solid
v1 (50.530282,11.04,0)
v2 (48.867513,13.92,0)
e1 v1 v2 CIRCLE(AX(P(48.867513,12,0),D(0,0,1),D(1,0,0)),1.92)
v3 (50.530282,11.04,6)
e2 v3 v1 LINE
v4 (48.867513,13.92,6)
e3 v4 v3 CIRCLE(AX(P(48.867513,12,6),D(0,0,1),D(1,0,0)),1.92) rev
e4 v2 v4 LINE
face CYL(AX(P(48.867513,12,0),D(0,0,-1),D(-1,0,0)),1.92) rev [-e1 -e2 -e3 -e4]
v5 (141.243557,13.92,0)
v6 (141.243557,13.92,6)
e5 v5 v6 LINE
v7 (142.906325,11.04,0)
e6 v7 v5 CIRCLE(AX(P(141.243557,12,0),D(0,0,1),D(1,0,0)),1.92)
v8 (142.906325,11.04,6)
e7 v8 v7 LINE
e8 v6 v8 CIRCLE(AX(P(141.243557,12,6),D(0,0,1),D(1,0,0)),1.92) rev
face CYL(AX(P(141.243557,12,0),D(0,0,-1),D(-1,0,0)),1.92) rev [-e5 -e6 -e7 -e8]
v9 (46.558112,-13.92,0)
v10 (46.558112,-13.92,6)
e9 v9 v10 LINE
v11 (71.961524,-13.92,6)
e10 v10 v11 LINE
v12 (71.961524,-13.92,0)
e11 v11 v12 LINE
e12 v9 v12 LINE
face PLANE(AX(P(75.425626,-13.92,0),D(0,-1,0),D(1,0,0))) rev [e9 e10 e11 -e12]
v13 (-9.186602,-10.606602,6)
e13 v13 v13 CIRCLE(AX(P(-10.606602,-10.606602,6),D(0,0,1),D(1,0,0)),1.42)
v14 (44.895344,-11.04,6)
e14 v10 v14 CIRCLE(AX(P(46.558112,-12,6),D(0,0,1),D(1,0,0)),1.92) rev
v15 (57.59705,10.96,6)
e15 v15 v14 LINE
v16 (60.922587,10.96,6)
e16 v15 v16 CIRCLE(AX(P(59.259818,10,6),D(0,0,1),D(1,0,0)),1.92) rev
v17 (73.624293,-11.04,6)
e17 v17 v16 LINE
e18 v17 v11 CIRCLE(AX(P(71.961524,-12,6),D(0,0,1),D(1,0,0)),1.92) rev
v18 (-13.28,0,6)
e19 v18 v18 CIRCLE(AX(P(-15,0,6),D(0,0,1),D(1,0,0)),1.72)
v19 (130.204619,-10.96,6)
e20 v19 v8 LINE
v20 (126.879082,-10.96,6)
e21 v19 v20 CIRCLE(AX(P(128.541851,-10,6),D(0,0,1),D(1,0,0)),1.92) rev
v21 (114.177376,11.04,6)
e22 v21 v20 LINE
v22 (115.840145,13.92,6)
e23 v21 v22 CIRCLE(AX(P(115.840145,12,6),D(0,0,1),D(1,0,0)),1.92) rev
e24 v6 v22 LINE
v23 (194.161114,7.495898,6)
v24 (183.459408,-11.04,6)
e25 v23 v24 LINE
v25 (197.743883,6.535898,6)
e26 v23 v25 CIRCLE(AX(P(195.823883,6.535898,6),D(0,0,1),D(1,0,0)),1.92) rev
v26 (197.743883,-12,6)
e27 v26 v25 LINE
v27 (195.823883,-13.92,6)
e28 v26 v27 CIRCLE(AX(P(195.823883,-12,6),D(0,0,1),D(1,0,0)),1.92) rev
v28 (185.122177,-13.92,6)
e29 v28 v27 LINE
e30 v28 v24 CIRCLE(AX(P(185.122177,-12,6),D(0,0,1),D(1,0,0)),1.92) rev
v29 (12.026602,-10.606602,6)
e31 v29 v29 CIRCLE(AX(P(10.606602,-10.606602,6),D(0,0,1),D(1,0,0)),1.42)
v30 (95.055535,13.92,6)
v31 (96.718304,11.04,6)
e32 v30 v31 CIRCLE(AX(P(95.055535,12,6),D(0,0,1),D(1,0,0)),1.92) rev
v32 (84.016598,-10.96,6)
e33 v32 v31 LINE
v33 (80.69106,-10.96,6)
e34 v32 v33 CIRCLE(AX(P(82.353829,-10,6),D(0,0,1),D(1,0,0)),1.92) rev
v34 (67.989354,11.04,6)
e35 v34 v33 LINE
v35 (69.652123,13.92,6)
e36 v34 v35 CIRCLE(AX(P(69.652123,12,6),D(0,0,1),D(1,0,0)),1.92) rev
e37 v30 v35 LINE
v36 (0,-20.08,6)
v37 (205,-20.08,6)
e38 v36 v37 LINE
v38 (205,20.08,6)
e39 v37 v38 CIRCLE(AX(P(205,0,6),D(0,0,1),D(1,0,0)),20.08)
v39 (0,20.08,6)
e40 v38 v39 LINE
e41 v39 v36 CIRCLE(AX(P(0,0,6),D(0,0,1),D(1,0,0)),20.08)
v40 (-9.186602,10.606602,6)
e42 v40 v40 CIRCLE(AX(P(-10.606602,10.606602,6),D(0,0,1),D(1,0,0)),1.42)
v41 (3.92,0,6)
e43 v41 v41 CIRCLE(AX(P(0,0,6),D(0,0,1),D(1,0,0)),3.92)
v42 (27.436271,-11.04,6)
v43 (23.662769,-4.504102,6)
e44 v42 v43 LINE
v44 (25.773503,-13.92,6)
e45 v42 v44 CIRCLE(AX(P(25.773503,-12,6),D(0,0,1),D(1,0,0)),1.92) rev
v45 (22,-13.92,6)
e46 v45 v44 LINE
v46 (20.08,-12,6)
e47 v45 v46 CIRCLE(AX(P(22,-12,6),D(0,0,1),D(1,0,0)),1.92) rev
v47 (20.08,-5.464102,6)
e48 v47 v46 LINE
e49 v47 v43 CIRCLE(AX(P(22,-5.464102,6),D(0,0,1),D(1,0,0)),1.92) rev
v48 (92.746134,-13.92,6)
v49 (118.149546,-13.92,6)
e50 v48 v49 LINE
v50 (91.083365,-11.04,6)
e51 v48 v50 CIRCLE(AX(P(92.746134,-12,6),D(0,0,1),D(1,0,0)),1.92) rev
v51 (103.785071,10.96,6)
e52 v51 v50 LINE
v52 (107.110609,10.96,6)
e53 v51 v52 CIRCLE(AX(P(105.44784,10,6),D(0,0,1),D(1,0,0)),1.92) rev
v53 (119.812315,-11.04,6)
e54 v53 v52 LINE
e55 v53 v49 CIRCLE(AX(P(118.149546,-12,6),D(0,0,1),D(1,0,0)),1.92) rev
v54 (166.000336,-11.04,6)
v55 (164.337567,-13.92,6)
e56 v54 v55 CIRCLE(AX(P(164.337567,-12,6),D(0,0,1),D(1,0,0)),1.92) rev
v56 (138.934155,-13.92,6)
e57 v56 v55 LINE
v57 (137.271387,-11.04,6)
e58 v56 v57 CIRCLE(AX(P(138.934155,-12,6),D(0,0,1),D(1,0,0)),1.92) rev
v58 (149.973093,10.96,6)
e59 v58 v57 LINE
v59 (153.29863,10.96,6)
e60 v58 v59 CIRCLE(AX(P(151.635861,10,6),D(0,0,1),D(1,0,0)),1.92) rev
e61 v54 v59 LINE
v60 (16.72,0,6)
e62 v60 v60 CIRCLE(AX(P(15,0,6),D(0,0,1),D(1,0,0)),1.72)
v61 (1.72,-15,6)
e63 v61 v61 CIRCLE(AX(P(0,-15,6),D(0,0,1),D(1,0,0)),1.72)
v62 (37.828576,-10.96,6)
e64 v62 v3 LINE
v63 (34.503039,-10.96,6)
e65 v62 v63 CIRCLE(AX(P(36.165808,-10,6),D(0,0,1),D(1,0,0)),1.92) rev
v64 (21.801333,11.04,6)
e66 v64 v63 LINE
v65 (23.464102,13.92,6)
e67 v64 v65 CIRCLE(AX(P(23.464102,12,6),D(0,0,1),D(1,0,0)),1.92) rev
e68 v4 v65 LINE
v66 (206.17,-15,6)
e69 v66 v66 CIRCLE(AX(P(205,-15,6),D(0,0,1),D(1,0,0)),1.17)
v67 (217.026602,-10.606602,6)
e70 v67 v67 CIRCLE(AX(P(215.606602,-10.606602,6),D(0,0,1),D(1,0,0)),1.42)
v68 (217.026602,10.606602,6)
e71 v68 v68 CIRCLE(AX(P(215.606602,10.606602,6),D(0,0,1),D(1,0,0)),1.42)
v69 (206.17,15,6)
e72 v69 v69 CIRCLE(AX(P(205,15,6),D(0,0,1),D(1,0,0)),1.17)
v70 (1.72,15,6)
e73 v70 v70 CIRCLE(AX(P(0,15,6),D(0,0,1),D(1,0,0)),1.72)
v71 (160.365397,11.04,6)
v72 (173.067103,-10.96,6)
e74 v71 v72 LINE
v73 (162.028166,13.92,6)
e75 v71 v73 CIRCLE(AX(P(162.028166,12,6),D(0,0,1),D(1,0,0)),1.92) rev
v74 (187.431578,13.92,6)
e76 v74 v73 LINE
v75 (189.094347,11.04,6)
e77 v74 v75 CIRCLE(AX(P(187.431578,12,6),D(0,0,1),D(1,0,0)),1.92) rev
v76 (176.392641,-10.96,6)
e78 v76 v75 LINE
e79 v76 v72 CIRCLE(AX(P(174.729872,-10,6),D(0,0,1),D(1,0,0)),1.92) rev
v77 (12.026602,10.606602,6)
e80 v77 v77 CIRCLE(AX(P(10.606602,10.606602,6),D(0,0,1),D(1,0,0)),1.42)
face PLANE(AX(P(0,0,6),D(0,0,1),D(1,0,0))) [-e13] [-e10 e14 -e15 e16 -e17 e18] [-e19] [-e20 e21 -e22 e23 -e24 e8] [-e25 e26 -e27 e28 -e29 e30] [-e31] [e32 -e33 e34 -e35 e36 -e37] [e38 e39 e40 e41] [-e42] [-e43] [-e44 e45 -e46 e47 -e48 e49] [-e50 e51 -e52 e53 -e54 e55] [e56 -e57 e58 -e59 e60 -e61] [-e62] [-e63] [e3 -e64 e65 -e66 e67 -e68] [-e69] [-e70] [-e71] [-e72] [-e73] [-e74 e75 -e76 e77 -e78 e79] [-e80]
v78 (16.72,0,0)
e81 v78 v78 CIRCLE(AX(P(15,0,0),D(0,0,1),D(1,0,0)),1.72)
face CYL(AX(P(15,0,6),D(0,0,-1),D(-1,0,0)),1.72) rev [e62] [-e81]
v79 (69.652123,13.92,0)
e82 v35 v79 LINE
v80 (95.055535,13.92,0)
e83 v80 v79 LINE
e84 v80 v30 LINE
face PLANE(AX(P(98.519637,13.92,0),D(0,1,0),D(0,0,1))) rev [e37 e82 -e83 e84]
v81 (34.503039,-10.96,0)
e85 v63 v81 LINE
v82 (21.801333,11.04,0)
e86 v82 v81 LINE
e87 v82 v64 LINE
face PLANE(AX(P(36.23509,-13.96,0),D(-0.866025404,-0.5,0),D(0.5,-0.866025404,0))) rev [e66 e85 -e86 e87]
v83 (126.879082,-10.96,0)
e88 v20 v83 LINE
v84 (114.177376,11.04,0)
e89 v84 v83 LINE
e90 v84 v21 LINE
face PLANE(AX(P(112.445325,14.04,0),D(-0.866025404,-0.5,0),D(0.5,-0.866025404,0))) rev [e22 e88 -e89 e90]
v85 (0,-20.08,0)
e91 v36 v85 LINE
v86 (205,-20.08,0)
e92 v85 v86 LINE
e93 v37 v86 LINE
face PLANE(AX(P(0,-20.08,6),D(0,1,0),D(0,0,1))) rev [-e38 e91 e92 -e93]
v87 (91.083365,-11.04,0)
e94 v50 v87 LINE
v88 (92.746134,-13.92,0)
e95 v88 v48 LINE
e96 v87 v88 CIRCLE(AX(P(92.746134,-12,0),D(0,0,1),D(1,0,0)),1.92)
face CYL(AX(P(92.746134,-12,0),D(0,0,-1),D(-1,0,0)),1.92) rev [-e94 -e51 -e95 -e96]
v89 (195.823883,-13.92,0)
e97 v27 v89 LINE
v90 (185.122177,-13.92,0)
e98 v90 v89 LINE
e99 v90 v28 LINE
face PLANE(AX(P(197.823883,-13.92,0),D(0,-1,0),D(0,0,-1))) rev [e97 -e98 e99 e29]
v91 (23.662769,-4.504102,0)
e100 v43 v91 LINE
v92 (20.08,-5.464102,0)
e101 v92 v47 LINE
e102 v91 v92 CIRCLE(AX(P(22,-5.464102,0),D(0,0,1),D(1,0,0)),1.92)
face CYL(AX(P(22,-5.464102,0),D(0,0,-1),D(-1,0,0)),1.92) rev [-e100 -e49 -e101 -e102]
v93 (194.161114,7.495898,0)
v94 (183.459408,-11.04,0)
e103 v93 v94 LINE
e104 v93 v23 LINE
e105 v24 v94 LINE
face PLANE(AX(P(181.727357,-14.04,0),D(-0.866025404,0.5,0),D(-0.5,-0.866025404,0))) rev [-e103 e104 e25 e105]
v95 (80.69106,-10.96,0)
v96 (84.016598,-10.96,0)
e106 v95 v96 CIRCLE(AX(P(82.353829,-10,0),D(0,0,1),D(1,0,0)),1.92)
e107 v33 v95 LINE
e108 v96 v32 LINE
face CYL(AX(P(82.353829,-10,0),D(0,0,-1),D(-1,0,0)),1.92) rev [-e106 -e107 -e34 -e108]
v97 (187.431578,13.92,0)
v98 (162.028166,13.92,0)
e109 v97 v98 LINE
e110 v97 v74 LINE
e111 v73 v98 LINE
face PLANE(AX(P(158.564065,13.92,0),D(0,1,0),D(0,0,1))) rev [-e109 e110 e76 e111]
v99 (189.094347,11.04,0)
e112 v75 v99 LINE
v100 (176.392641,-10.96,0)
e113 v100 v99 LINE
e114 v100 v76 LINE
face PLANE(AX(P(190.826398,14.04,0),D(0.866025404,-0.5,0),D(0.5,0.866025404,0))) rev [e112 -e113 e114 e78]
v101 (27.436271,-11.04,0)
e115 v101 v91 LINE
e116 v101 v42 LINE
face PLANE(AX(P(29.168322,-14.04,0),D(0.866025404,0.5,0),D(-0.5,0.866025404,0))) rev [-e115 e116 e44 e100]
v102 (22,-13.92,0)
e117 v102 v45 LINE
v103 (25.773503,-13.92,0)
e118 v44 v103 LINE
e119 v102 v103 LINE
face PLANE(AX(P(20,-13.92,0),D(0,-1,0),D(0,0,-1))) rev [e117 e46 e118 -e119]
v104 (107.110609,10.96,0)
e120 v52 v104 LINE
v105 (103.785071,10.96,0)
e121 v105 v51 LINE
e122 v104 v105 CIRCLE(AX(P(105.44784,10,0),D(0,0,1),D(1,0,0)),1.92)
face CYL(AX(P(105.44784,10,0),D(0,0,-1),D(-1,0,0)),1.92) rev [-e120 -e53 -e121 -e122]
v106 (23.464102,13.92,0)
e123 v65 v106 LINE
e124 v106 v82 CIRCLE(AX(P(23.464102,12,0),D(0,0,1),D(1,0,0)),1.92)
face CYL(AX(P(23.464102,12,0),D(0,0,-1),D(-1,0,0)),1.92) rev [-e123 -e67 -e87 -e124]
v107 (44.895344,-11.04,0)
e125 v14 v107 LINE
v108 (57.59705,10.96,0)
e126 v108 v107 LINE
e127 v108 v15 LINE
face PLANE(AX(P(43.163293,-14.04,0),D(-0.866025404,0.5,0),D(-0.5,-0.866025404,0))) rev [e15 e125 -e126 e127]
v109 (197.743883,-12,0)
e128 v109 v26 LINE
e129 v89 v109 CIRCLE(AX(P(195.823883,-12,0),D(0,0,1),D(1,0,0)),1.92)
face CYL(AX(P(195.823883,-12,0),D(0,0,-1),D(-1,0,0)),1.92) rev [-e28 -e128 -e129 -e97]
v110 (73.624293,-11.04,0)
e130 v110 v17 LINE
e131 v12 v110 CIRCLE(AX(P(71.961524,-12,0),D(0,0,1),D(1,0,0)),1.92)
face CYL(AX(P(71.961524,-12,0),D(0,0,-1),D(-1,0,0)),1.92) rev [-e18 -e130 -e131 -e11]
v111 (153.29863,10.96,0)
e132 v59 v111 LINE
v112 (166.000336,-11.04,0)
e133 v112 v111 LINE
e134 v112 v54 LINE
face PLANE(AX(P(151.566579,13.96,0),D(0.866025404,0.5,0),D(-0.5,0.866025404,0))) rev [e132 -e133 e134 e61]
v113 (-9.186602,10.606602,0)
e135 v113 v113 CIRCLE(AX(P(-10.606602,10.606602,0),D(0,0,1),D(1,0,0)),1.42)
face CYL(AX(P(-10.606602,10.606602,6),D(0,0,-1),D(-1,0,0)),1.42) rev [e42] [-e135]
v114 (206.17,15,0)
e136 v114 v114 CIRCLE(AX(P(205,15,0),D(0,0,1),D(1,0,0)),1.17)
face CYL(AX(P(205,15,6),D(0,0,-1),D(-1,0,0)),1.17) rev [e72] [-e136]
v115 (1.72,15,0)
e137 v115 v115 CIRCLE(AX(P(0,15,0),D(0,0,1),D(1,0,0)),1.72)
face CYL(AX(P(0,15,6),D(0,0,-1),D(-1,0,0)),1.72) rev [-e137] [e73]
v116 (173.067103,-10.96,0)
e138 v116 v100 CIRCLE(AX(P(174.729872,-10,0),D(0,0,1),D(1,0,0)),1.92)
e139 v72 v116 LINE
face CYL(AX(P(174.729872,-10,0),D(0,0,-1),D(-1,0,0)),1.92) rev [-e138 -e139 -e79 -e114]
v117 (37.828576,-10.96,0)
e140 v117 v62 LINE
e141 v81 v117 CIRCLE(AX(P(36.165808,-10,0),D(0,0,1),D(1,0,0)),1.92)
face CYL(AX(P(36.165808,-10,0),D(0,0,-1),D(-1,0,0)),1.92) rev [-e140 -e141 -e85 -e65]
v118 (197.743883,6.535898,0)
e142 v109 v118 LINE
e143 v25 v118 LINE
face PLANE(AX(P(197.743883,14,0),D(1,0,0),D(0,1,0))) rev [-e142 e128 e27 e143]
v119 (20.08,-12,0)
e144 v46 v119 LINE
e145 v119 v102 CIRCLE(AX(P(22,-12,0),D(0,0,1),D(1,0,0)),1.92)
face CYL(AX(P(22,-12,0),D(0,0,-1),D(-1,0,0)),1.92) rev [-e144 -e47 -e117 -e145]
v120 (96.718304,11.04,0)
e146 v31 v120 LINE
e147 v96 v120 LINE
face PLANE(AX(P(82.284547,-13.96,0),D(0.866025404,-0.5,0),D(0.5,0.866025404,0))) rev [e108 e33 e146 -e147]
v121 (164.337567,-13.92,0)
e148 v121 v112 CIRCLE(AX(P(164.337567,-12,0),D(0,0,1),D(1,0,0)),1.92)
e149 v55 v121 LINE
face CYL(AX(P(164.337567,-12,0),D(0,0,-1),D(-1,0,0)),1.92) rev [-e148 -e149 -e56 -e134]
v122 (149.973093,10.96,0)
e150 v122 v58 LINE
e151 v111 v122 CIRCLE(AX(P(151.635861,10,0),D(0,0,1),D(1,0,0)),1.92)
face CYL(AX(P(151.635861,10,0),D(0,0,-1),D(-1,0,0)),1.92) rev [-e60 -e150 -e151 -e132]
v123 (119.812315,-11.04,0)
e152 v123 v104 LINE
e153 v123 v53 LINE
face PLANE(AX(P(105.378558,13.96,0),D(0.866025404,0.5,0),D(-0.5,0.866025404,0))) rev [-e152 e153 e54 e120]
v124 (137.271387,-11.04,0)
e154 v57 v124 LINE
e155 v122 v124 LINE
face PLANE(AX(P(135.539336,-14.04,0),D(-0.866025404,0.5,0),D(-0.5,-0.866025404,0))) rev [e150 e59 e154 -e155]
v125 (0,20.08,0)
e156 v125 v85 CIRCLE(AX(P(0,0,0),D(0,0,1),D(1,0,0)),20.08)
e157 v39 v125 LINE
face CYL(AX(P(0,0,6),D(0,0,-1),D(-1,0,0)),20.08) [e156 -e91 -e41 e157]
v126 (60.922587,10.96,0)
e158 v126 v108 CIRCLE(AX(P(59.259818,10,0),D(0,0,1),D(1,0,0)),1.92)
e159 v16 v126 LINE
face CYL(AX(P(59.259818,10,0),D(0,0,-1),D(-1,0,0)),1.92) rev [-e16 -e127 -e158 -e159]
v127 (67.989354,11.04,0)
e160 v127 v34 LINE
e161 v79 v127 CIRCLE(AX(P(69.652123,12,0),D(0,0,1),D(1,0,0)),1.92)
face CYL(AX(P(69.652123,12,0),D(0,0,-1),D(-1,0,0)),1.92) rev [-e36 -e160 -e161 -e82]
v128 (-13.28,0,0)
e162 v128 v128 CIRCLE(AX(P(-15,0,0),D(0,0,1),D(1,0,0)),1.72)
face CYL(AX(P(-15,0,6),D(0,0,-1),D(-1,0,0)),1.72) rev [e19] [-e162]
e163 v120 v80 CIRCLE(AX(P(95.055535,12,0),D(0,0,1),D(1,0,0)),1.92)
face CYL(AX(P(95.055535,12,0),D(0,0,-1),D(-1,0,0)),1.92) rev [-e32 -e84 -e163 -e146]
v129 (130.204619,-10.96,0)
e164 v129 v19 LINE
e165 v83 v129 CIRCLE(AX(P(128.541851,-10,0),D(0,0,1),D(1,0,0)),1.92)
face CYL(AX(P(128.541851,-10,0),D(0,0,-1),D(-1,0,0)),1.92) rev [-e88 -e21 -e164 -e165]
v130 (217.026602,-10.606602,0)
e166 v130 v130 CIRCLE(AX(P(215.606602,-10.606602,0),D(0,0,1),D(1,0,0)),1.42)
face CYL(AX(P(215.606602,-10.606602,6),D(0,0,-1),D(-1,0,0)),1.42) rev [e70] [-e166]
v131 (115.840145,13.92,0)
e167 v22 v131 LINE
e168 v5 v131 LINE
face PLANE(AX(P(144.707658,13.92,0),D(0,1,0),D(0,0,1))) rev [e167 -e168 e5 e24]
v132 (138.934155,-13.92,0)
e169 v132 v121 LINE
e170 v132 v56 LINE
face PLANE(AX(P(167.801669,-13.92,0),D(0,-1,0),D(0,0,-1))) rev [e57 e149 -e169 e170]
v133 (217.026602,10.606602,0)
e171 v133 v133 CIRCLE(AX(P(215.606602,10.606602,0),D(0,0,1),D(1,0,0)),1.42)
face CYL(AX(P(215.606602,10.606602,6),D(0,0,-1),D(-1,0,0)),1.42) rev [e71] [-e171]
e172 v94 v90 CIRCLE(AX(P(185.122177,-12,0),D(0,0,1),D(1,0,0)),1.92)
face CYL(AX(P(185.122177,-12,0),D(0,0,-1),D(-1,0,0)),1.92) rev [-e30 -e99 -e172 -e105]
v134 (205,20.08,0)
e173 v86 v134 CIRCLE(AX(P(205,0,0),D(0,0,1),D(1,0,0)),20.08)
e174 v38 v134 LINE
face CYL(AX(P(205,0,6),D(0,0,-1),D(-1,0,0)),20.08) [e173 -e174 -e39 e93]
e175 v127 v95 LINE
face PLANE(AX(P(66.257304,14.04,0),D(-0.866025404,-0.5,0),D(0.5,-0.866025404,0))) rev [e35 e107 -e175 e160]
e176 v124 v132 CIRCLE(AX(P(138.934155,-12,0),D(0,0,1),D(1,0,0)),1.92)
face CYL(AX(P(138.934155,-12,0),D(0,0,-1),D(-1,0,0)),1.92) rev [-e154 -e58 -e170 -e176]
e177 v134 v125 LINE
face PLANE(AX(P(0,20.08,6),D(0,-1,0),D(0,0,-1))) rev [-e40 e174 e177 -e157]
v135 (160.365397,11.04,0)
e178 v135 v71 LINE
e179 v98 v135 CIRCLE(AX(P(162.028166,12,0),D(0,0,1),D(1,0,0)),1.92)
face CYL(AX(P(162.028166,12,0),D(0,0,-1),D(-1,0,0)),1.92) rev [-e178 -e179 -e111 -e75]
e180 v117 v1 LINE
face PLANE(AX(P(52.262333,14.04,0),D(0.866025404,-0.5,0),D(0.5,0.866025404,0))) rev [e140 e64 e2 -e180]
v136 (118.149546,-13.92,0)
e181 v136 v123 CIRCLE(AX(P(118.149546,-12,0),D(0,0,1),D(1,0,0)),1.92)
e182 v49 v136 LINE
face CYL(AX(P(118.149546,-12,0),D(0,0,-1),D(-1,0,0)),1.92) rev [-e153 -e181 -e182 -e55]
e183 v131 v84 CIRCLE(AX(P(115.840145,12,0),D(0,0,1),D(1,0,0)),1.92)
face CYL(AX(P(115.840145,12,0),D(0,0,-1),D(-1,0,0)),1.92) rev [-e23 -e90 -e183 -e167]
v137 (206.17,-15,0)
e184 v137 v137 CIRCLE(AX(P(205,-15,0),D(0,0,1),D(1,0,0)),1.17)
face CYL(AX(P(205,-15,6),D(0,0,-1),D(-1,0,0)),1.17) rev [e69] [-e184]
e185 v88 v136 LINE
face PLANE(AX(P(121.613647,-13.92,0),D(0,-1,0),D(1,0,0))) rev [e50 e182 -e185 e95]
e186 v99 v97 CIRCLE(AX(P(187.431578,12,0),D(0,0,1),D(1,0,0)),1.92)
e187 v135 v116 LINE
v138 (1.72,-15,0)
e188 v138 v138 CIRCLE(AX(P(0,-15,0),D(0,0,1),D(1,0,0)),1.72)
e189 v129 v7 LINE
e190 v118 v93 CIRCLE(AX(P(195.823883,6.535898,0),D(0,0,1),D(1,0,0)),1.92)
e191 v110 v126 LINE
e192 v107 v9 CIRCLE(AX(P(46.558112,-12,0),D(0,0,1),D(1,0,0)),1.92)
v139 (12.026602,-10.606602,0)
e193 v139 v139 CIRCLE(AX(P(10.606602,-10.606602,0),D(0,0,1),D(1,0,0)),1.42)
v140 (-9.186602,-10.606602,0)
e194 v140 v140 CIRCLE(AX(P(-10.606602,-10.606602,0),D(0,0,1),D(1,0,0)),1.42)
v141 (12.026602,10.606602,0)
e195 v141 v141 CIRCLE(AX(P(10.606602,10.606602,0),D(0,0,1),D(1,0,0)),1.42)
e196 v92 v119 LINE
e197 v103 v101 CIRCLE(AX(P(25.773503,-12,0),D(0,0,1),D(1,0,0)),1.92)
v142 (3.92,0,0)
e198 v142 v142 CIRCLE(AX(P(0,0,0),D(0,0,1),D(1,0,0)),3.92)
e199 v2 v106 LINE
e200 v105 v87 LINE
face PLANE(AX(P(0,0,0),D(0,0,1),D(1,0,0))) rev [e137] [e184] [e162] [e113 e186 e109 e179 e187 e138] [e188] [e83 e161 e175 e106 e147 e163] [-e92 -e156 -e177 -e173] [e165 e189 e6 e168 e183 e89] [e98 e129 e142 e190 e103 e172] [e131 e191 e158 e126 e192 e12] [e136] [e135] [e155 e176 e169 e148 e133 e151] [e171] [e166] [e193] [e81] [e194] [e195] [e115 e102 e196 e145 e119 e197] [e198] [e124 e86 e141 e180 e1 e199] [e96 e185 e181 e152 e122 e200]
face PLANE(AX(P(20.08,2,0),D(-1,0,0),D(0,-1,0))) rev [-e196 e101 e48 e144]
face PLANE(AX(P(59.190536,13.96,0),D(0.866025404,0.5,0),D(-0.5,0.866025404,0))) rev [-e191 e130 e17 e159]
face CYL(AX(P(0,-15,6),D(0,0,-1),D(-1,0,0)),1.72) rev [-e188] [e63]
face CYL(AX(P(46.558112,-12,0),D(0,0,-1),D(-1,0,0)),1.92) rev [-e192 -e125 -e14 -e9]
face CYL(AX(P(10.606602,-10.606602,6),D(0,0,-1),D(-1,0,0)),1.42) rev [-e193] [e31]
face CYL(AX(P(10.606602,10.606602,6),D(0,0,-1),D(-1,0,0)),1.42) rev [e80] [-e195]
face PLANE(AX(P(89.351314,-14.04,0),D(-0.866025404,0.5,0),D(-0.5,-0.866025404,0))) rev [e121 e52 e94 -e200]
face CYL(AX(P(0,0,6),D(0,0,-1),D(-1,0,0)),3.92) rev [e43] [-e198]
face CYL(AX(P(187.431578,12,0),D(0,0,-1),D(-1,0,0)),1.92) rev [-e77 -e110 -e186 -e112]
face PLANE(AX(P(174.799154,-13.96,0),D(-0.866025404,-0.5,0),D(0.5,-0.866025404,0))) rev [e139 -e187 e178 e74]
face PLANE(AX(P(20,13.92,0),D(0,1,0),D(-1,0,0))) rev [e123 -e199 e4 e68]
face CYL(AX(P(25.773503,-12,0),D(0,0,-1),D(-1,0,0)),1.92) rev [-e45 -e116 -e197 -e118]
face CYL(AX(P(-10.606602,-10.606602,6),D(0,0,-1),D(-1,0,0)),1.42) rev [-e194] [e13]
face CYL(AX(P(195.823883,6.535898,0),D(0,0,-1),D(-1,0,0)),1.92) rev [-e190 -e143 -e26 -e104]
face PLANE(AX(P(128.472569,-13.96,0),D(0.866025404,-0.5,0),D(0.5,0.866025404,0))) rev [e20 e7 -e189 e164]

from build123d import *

# Parameters (mm, degrees)
SKETCH1_R              = 4
SKETCH1_R_2            = 1.25
SKETCH1_R_3            = 1.5
SKETCH1_R_4            = 1.8
BOSS_EXTRUDE1_DEPTH    = 6
CUT_EXTRUDE1_DEPTH     = 226.966811722
FILLET1_R              = 2
MOVE_FACE1_OUTLINE_R   = 4
MOVE_FACE1_OUTLINE_R_2 = 3.92
MOVE_FACE1_OUTLINE_R_3 = 1.25
MOVE_FACE1_OUTLINE_R_4 = 1.17
MOVE_FACE1_OUTLINE_R_5 = 1.5
MOVE_FACE1_OUTLINE_R_6 = 1.42
MOVE_FACE1_OUTLINE_R_7 = 1.8
MOVE_FACE1_OUTLINE_R_8 = 1.72
MOVE_FACE1_DEPTH       = 6


# Read off the part's stored shape, not the designer's step: Move Face1
with BuildPart() as part:
    # Sketch1 → Boss-Extrude1 (new body)
    with BuildSketch(Plane.XY):
        with BuildLine():
            Line((0, -20), (205, -20))
            ThreePointArc((205, -20), (225, 0), (205, 20))
            Line((205, 20), (0, 20))
            ThreePointArc((0, 20), (-20, 0), (0, -20))
        make_face()
        Circle(SKETCH1_R, mode=Mode.SUBTRACT)
        with Locations((205, -15)):
            Circle(SKETCH1_R_2, mode=Mode.SUBTRACT)
        with Locations((215.606601718, -10.606601718)):
            Circle(SKETCH1_R_3, mode=Mode.SUBTRACT)
        with Locations((205, 15)):
            Circle(SKETCH1_R_2, mode=Mode.SUBTRACT)
        with Locations((215.606601718, 10.606601718)):
            Circle(SKETCH1_R_3, mode=Mode.SUBTRACT)
        with Locations((0, -15)):
            Circle(SKETCH1_R_4, mode=Mode.SUBTRACT)
        with Locations((10.606601718, -10.606601718)):
            Circle(SKETCH1_R_3, mode=Mode.SUBTRACT)
        with Locations((-15, 0)):
            Circle(SKETCH1_R_4, mode=Mode.SUBTRACT)
        with Locations((-10.606601718, -10.606601718)):
            Circle(SKETCH1_R_3, mode=Mode.SUBTRACT)
        with Locations((0, 15)):
            Circle(SKETCH1_R_4, mode=Mode.SUBTRACT)
        with Locations((-10.606601718, 10.606601718)):
            Circle(SKETCH1_R_3, mode=Mode.SUBTRACT)
        with Locations((15, 0)):
            Circle(SKETCH1_R_4, mode=Mode.SUBTRACT)
        with Locations((10.606601718, 10.606601718)):
            Circle(SKETCH1_R_3, mode=Mode.SUBTRACT)
    extrude(amount=BOSS_EXTRUDE1_DEPTH)

    # Sketch2 → Cut-Extrude1 (cut, through all)
    with BuildSketch(Plane.XY.offset(6)):
        Polygon((20, 14), (52.331615075, 14), (36.165807537, -14), align=None)
        Polygon((43.094010768, -14), (59.259818305, 14), (75.425625842, -14), align=None)
        Polygon((66.188021535, 14), (82.353829072, -14), (98.51963661, 14), align=None)
        Polygon((89.282032303, -14), (105.44783984, 14), (121.613647377, -14), align=None)
        Polygon((112.37604307, 14), (128.541850608, -14), (144.707658145, 14), align=None)
        Polygon((20, 2), (20, -14), (29.237604307, -14), align=None)
        Polygon((135.470053838, -14), (151.635861375, 14), (167.801668913, -14), align=None)
        Polygon((174.729872143, -14), (158.564064606, 14), (190.89567968, 14), align=None)
        Polygon((181.658075373, -14), (197.82388291, 14), (197.82388291, -14), align=None)
    extrude(amount=-CUT_EXTRUDE1_DEPTH, mode=Mode.SUBTRACT)

    # Fillet1
    fillet1_edges = [part.edges().sort_by_distance(p)[0] for p in [
        (121.613647377, -14, 3),
        (89.282032303, -14, 3),
        (105.44783984, 14, 3),
        (112.37604307, 14, 3),
        (144.707658145, 14, 3),
        (128.541850608, -14, 3),
        (20, 2, 3),
        (29.237604307, -14, 3),
        (20, -14, 3),
        (167.801668913, -14, 3),
        (135.470053838, -14, 3),
        (151.635861375, 14, 3),
        (190.89567968, 14, 3),
        (174.729872143, -14, 3),
        (158.564064606, 14, 3),
        (197.82388291, -14, 3),
        (181.658075373, -14, 3),
        (197.82388291, 14, 3),
        (36.165807537, -14, 3),
        (20, 14, 3),
        (52.331615075, 14, 3),
        (75.425625842, -14, 3),
        (43.094010768, -14, 3),
        (59.259818305, 14, 3),
        (66.188021535, 14, 3),
        (98.51963661, 14, 3),
        (82.353829072, -14, 3),
    ]]
    fillet(fillet1_edges, radius=FILLET1_R)

    # Move Face1 outline → Move Face1 (add)
    # profile 1 of 23: a face of its own
    with BuildSketch(Plane.XY):
        with BuildLine():
            ThreePointArc((0, 20.08), (-20.08, 0), (0, -20.08))
            Line((0, -20.08), (205, -20.08))
            ThreePointArc((205, -20.08), (225.08, 0), (205, 20.08))
            Line((205, 20.08), (0, 20.08))
        make_face()
        with BuildLine():
            Line((205, -20), (0, -20))
            ThreePointArc((0, -20), (-20, 0), (0, 20))
            Line((0, 20), (205, 20))
            ThreePointArc((205, 20), (225, 0), (205, -20))
        make_face(mode=Mode.SUBTRACT)
    # profile 2 of 23: a face of its own
    with BuildSketch(Plane.XY):
        Circle(MOVE_FACE1_OUTLINE_R)
        Circle(MOVE_FACE1_OUTLINE_R_2, mode=Mode.SUBTRACT)
    # profile 3 of 23: a face of its own
    with BuildSketch(Plane.XY):
        with Locations((205, -15)):
            Circle(MOVE_FACE1_OUTLINE_R_3)
        with Locations((205, -15)):
            Circle(MOVE_FACE1_OUTLINE_R_4, mode=Mode.SUBTRACT)
    # profile 4 of 23: a face of its own
    with BuildSketch(Plane.XY):
        with Locations((215.606601718, -10.606601718)):
            Circle(MOVE_FACE1_OUTLINE_R_5)
        with Locations((215.606601718, -10.606601718)):
            Circle(MOVE_FACE1_OUTLINE_R_6, mode=Mode.SUBTRACT)
    # profile 5 of 23: a face of its own
    with BuildSketch(Plane.XY):
        with Locations((205, 15)):
            Circle(MOVE_FACE1_OUTLINE_R_3)
        with Locations((205, 15)):
            Circle(MOVE_FACE1_OUTLINE_R_4, mode=Mode.SUBTRACT)
    # profile 6 of 23: a face of its own
    with BuildSketch(Plane.XY):
        with Locations((215.606601718, 10.606601718)):
            Circle(MOVE_FACE1_OUTLINE_R_5)
        with Locations((215.606601718, 10.606601718)):
            Circle(MOVE_FACE1_OUTLINE_R_6, mode=Mode.SUBTRACT)
    # profile 7 of 23: a face of its own
    with BuildSketch(Plane.XY):
        with Locations((0, -15)):
            Circle(MOVE_FACE1_OUTLINE_R_7)
        with Locations((0, -15)):
            Circle(MOVE_FACE1_OUTLINE_R_8, mode=Mode.SUBTRACT)
    # profile 8 of 23: a face of its own
    with BuildSketch(Plane.XY):
        with Locations((10.606601718, -10.606601718)):
            Circle(MOVE_FACE1_OUTLINE_R_5)
        with Locations((10.606601718, -10.606601718)):
            Circle(MOVE_FACE1_OUTLINE_R_6, mode=Mode.SUBTRACT)
    # profile 9 of 23: a face of its own
    with BuildSketch(Plane.XY):
        with Locations((-15, 0)):
            Circle(MOVE_FACE1_OUTLINE_R_7)
        with Locations((-15, 0)):
            Circle(MOVE_FACE1_OUTLINE_R_8, mode=Mode.SUBTRACT)
    # profile 10 of 23: a face of its own
    with BuildSketch(Plane.XY):
        with Locations((-10.606601718, -10.606601718)):
            Circle(MOVE_FACE1_OUTLINE_R_5)
        with Locations((-10.606601718, -10.606601718)):
            Circle(MOVE_FACE1_OUTLINE_R_6, mode=Mode.SUBTRACT)
    # profile 11 of 23: a face of its own
    with BuildSketch(Plane.XY):
        with Locations((0, 15)):
            Circle(MOVE_FACE1_OUTLINE_R_7)
        with Locations((0, 15)):
            Circle(MOVE_FACE1_OUTLINE_R_8, mode=Mode.SUBTRACT)
    # profile 12 of 23: a face of its own
    with BuildSketch(Plane.XY):
        with Locations((-10.606601718, 10.606601718)):
            Circle(MOVE_FACE1_OUTLINE_R_5)
        with Locations((-10.606601718, 10.606601718)):
            Circle(MOVE_FACE1_OUTLINE_R_6, mode=Mode.SUBTRACT)
    # profile 13 of 23: a face of its own
    with BuildSketch(Plane.XY):
        with Locations((15, 0)):
            Circle(MOVE_FACE1_OUTLINE_R_7)
        with Locations((15, 0)):
            Circle(MOVE_FACE1_OUTLINE_R_8, mode=Mode.SUBTRACT)
    # profile 14 of 23: a face of its own
    with BuildSketch(Plane.XY):
        with Locations((10.606601718, 10.606601718)):
            Circle(MOVE_FACE1_OUTLINE_R_5)
        with Locations((10.606601718, 10.606601718)):
            Circle(MOVE_FACE1_OUTLINE_R_6, mode=Mode.SUBTRACT)
    # profile 15 of 23: a face of its own
    with BuildSketch(Plane.XY):
        with BuildLine():
            ThreePointArc((23.464101615, 14), (21.732050808, 13), (21.732050808, 11))
            Line((21.732050808, 11), (34.43375673, -11))
            ThreePointArc((34.43375673, -11), (36.165807538, -12), (37.897858345, -11))
            Line((37.897858345, -11), (50.599564267, 11))
            ThreePointArc((50.599564267, 11), (50.599564267, 13), (48.867513459, 14))
            Line((48.867513459, 14), (23.464101615, 14))
        make_face()
        with BuildLine():
            Line((34.503038762, -10.96), (21.80133284, 11.04))
            ThreePointArc((21.80133284, 11.04), (21.80133284, 12.96), (23.464101615, 13.92))
            Line((23.464101615, 13.92), (48.867513459, 13.92))
            ThreePointArc((48.867513459, 13.92), (50.530282235, 12.96), (50.530282235, 11.04))
            Line((50.530282235, 11.04), (37.828576313, -10.96))
            ThreePointArc((37.828576313, -10.96), (36.165807538, -11.92), (34.503038762, -10.96))
        make_face(mode=Mode.SUBTRACT)
    # profile 16 of 23: a face of its own
    with BuildSketch(Plane.XY):
        with BuildLine():
            ThreePointArc((96.787585802, 11), (96.787585802, 13), (95.055534995, 14))
            Line((95.055534995, 14), (69.65212315, 14))
            ThreePointArc((69.65212315, 14), (67.920072343, 13), (67.920072343, 11))
            Line((67.920072343, 11), (80.621778265, -11))
            ThreePointArc((80.621778265, -11), (82.353829072, -12), (84.08587988, -11))
            Line((84.08587988, -11), (96.787585802, 11))
        make_face()
        with BuildLine():
            Line((69.65212315, 13.92), (95.055534995, 13.92))
            ThreePointArc((95.055534995, 13.92), (96.71830377, 12.96), (96.71830377, 11.04))
            Line((96.71830377, 11.04), (84.016597848, -10.96))
            ThreePointArc((84.016597848, -10.96), (82.353829073, -11.92), (80.691060297, -10.96))
            Line((80.691060297, -10.96), (67.989354375, 11.04))
            ThreePointArc((67.989354375, 11.04), (67.989354375, 12.96), (69.65212315, 13.92))
        make_face(mode=Mode.SUBTRACT)
    # profile 17 of 23: a face of its own
    with BuildSketch(Plane.XY):
        with BuildLine():
            ThreePointArc((142.975607337, 11), (142.975607337, 13), (141.24355653, 14))
            Line((141.24355653, 14), (115.840144685, 14))
            ThreePointArc((115.840144685, 14), (114.108093878, 13), (114.108093878, 11))
            Line((114.108093878, 11), (126.8097998, -11))
            ThreePointArc((126.8097998, -11), (128.541850608, -12), (130.273901415, -11))
            Line((130.273901415, -11), (142.975607337, 11))
        make_face()
        with BuildLine():
            Line((115.840144685, 13.92), (141.24355653, 13.92))
            ThreePointArc((141.24355653, 13.92), (142.906325305, 12.96), (142.906325305, 11.04))
            Line((142.906325305, 11.04), (130.204619383, -10.96))
            ThreePointArc((130.204619383, -10.96), (128.541850608, -11.92), (126.879081832, -10.96))
            Line((126.879081832, -10.96), (114.17737591, 11.04))
            ThreePointArc((114.17737591, 11.04), (114.17737591, 12.96), (115.840144685, 13.92))
        make_face(mode=Mode.SUBTRACT)
    # profile 18 of 23: a face of its own
    with BuildSketch(Plane.XY):
        with BuildLine():
            ThreePointArc((189.163628873, 11), (189.163628873, 13), (187.431578065, 14))
            Line((187.431578065, 14), (162.028166221, 14))
            ThreePointArc((162.028166221, 14), (160.296115413, 13), (160.296115413, 11))
            Line((160.296115413, 11), (172.997821335, -11))
            ThreePointArc((172.997821335, -11), (174.729872142, -12), (176.46192295, -11))
            Line((176.46192295, -11), (189.163628873, 11))
        make_face()
        with BuildLine():
            Line((162.028166221, 13.92), (187.431578065, 13.92))
            ThreePointArc((187.431578065, 13.92), (189.09434684, 12.96), (189.09434684, 11.04))
            Line((189.09434684, 11.04), (176.392640918, -10.96))
            ThreePointArc((176.392640918, -10.96), (174.729872143, -11.92), (173.067103368, -10.96))
            Line((173.067103368, -10.96), (160.365397445, 11.04))
            ThreePointArc((160.365397445, 11.04), (160.365397445, 12.96), (162.028166221, 13.92))
        make_face(mode=Mode.SUBTRACT)
    # profile 19 of 23: a face of its own
    with BuildSketch(Plane.XY):
        with BuildLine():
            ThreePointArc((44.826061575, -11), (44.826061575, -13), (46.558112383, -14))
            Line((46.558112383, -14), (71.961524227, -14))
            ThreePointArc((71.961524227, -14), (73.693575035, -13), (73.693575035, -11))
            Line((73.693575035, -11), (60.991869112, 11))
            ThreePointArc((60.991869112, 11), (59.259818305, 12), (57.527767497, 11))
            Line((57.527767497, 11), (44.826061575, -11))
        make_face()
        with BuildLine():
            Line((71.961524227, -13.92), (46.558112383, -13.92))
            ThreePointArc((46.558112383, -13.92), (44.895343607, -12.96), (44.895343607, -11.04))
            Line((44.895343607, -11.04), (57.59704953, 10.96))
            ThreePointArc((57.59704953, 10.96), (59.259818305, 11.92), (60.92258708, 10.96))
            Line((60.92258708, 10.96), (73.624293002, -11.04))
            ThreePointArc((73.624293002, -11.04), (73.624293002, -12.96), (71.961524227, -13.92))
        make_face(mode=Mode.SUBTRACT)
    # profile 20 of 23: a face of its own
    with BuildSketch(Plane.XY):
        with BuildLine():
            ThreePointArc((91.01408311, -11), (91.01408311, -13), (92.746133918, -14))
            Line((92.746133918, -14), (118.149545762, -14))
            ThreePointArc((118.149545762, -14), (119.88159657, -13), (119.88159657, -11))
            Line((119.88159657, -11), (107.179890648, 11))
            ThreePointArc((107.179890648, 11), (105.44783984, 12), (103.715789032, 11))
            Line((103.715789032, 11), (91.01408311, -11))
        make_face()
        with BuildLine():
            Line((118.149545762, -13.92), (92.746133918, -13.92))
            ThreePointArc((92.746133918, -13.92), (91.083365143, -12.96), (91.083365143, -11.04))
            Line((91.083365143, -11.04), (103.785071065, 10.96))
            ThreePointArc((103.785071065, 10.96), (105.44783984, 11.92), (107.110608615, 10.96))
            Line((107.110608615, 10.96), (119.812314538, -11.04))
            ThreePointArc((119.812314538, -11.04), (119.812314538, -12.96), (118.149545762, -13.92))
        make_face(mode=Mode.SUBTRACT)
    # profile 21 of 23: a face of its own
    with BuildSketch(Plane.XY):
        with BuildLine():
            ThreePointArc((20, -12), (20.585786438, -13.414213562), (22, -14))
            Line((22, -14), (25.773502692, -14))
            ThreePointArc((25.773502692, -14), (27.505553499, -13), (27.505553499, -11))
            Line((27.505553499, -11), (23.732050808, -4.464101615))
            ThreePointArc((23.732050808, -4.464101615), (21.48236191, -3.532249963), (20, -5.464101615))
            Line((20, -5.464101615), (20, -12))
        make_face()
        with BuildLine():
            Line((25.773502692, -13.92), (22, -13.92))
            ThreePointArc((22, -13.92), (20.64235498, -13.35764502), (20.08, -12))
            Line((20.08, -12), (20.08, -5.464101615))
            ThreePointArc((20.08, -5.464101615), (21.503067433, -3.609524029), (23.662768775, -4.504101615))
            Line((23.662768775, -4.504101615), (27.436271467, -11.04))
            ThreePointArc((27.436271467, -11.04), (27.436271467, -12.96), (25.773502692, -13.92))
        make_face(mode=Mode.SUBTRACT)
    # profile 22 of 23: a face of its own
    with BuildSketch(Plane.XY):
        with BuildLine():
            ThreePointArc((137.202104645, -11), (137.202104645, -13), (138.934155453, -14))
            Line((138.934155453, -14), (164.337567297, -14))
            ThreePointArc((164.337567297, -14), (166.069618105, -13), (166.069618105, -11))
            Line((166.069618105, -11), (153.367912183, 11))
            ThreePointArc((153.367912183, 11), (151.635861376, 12), (149.903810568, 11))
            Line((149.903810568, 11), (137.202104645, -11))
        make_face()
        with BuildLine():
            Line((164.337567297, -13.92), (138.934155453, -13.92))
            ThreePointArc((138.934155453, -13.92), (137.271386678, -12.96), (137.271386678, -11.04))
            Line((137.271386678, -11.04), (149.9730926, 10.96))
            ThreePointArc((149.9730926, 10.96), (151.635861375, 11.92), (153.298630151, 10.96))
            Line((153.298630151, 10.96), (166.000336073, -11.04))
            ThreePointArc((166.000336073, -11.04), (166.000336073, -12.96), (164.337567297, -13.92))
        make_face(mode=Mode.SUBTRACT)
    # profile 23 of 23: a face of its own
    with BuildSketch(Plane.XY):
        with BuildLine():
            ThreePointArc((183.390126181, -11), (183.390126181, -13), (185.122176988, -14))
            Line((185.122176988, -14), (195.82388291, -14))
            ThreePointArc((195.82388291, -14), (197.238096473, -13.414213563), (197.82388291, -12))
            Line((197.82388291, -12), (197.82388291, 6.535898385))
            ThreePointArc((197.82388291, 6.535898385), (196.341521, 8.467750037), (194.091832103, 7.535898385))
            Line((194.091832103, 7.535898385), (183.390126181, -11))
        make_face()
        with BuildLine():
            Line((195.82388291, -13.92), (185.122176988, -13.92))
            ThreePointArc((185.122176988, -13.92), (183.459408213, -12.96), (183.459408213, -11.04))
            Line((183.459408213, -11.04), (194.161114135, 7.495898385))
            ThreePointArc((194.161114135, 7.495898385), (196.320815477, 8.390475971), (197.74388291, 6.535898385))
            Line((197.74388291, 6.535898385), (197.74388291, -12))
            ThreePointArc((197.74388291, -12), (197.18152793, -13.35764502), (195.82388291, -13.92))
        make_face(mode=Mode.SUBTRACT)
    extrude(amount=MOVE_FACE1_DEPTH)


solid = part.part
